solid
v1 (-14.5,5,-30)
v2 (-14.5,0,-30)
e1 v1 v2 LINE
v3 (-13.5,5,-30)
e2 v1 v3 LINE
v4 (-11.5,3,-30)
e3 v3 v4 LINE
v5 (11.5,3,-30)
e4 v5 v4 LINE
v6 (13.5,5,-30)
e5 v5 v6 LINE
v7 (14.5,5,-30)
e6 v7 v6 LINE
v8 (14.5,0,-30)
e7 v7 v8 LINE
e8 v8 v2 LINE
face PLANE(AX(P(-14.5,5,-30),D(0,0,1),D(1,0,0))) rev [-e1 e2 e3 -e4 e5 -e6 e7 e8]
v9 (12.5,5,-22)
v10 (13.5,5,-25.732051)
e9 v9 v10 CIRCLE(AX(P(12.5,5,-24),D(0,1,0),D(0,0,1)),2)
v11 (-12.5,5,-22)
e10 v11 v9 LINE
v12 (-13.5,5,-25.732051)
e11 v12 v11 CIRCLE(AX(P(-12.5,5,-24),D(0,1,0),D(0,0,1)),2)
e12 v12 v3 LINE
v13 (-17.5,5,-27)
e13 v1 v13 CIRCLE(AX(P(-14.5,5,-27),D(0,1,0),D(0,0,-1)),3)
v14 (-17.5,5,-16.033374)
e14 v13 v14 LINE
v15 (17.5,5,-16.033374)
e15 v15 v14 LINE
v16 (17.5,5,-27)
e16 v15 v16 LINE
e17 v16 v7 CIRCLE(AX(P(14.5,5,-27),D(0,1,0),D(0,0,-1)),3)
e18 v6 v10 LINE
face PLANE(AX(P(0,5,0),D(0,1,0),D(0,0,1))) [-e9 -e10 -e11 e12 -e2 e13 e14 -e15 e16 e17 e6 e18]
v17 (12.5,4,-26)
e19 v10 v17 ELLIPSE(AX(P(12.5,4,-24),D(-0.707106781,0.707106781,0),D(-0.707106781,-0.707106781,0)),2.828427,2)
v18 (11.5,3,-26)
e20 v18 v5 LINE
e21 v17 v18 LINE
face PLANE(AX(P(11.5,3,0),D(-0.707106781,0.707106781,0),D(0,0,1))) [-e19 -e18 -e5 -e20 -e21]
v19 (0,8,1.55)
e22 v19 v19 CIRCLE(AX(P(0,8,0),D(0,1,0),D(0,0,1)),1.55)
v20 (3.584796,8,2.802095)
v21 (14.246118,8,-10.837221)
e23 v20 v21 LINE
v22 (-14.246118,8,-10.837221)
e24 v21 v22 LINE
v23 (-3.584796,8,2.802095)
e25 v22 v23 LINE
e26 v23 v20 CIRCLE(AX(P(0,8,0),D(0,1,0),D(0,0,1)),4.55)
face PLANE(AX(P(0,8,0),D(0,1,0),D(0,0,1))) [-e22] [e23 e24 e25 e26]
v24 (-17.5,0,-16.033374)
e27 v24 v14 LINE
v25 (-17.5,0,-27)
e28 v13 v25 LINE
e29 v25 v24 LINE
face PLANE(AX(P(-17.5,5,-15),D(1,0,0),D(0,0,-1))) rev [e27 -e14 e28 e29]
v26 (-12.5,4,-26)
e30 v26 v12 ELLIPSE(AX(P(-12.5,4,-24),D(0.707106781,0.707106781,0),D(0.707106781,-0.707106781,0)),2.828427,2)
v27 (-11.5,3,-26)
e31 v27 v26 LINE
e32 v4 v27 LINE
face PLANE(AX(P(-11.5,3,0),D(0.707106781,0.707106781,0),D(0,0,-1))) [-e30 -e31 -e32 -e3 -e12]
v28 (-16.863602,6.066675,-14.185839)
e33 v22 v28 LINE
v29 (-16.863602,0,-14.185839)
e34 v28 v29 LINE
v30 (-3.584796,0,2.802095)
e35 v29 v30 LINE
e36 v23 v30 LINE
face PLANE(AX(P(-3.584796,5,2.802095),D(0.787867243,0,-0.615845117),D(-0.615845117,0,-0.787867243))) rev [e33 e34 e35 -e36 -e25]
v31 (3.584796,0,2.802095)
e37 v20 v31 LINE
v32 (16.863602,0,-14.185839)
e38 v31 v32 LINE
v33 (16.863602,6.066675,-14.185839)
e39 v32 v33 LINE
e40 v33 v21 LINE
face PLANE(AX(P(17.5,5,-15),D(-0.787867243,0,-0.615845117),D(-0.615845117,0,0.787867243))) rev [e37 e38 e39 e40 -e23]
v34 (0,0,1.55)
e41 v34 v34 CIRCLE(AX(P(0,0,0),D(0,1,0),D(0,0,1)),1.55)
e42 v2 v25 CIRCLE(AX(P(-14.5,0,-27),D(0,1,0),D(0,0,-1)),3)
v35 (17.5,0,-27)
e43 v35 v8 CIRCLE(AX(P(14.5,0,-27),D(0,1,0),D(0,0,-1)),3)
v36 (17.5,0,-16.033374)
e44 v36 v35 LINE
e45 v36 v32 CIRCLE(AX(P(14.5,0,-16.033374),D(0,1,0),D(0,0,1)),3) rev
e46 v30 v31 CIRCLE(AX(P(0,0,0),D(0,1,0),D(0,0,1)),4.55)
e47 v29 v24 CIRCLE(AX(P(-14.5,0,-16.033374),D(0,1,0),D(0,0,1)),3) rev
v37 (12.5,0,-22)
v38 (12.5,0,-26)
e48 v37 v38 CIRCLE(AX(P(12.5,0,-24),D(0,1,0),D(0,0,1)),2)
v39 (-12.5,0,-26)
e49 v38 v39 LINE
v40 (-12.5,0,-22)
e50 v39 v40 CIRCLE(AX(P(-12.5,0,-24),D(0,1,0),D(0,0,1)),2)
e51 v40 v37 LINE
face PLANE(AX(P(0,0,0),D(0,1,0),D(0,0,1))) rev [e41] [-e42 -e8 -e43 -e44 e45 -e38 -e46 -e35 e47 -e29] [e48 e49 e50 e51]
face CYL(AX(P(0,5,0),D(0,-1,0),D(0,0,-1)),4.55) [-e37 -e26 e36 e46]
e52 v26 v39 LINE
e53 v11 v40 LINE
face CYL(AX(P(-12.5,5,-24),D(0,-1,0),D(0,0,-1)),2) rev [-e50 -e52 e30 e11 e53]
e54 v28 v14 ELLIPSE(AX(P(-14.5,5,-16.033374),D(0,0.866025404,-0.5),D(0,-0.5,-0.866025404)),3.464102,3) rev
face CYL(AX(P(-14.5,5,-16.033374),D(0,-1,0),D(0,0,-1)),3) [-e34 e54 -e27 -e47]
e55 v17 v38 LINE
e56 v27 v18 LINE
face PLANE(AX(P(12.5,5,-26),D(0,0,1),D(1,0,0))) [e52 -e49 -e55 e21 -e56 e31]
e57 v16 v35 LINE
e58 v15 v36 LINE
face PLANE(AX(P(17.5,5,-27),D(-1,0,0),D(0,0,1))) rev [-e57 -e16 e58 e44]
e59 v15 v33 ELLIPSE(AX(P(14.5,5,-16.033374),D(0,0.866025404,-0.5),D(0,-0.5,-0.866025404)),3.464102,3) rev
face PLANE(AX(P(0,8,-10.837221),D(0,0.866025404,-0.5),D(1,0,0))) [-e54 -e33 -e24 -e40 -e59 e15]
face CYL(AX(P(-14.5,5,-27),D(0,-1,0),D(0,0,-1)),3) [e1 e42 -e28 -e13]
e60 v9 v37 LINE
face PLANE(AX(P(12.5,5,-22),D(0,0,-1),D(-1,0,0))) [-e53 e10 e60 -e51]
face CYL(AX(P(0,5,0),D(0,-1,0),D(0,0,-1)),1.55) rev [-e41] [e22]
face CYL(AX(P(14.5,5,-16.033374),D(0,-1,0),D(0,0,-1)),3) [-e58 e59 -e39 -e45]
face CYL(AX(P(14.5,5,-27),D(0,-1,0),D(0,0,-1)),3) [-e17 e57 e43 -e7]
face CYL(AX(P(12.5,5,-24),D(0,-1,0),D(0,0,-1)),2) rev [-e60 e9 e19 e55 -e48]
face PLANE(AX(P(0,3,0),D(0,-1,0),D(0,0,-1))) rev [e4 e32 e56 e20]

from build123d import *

# Parameters (mm, degrees)
SKETCH1_R           = 1.55
BOSS_EXTRUDE1_DEPTH = 5
SKETCH2_W           = 29
SKETCH2_H           = 6
CUT_EXTRUDE1_DEPTH  = 2
CHAMFER1_START      = 3
CHAMFER1_DEPTH      = 2
CHAMFER1_START_2    = -30
CHAMFER1_2_DEPTH    = 6
FILLET1_R           = 3
SKETCH3_R           = 1.55
BOSS_EXTRUDE2_DEPTH = 3
CHAMFER2_SIZE2      = 5.196152423
CHAMFER2_SIZE       = 3


with BuildPart() as part:
    # Sketch1 → Boss-Extrude1 (new body)
    with BuildSketch(Plane(origin=(0, 0, 0), x_dir=(1, 0, 0), z_dir=(0, 1, 0))):
        with BuildLine():
            Line((-3.584795955, -2.802095281), (-17.5, 15))
            Line((-17.5, 15), (-17.5, 27))
            ThreePointArc((-17.5, 27), (-16.621320344, 29.121320344), (-14.5, 30))
            Line((-14.5, 30), (14.5, 30))
            ThreePointArc((14.5, 30), (16.621320344, 29.121320344), (17.5, 27))
            Line((17.5, 27), (17.5, 15))
            Line((17.5, 15), (3.584795955, -2.802095281))
            ThreePointArc((3.584795955, -2.802095281), (0, -4.55), (-3.584795955, -2.802095281))
        make_face()
        with Locations(Location((0, 0, 0), (0, 0, 270))):
            Circle(SKETCH1_R, mode=Mode.SUBTRACT)
        with BuildLine():
            Line((12.5, 22), (-12.5, 22))
            ThreePointArc((-12.5, 22), (-14.5, 24), (-12.5, 26))
            Line((-12.5, 26), (12.5, 26))
            ThreePointArc((12.5, 26), (14.5, 24), (12.5, 22))
        make_face(mode=Mode.SUBTRACT)
    extrude(amount=BOSS_EXTRUDE1_DEPTH)

    # Sketch2 → Cut-Extrude1 (cut)
    with BuildSketch(Plane(origin=(0, 5, 0), x_dir=(1, 0, 0), z_dir=(0, 1, 0))):
        with Locations((0, 27)):
            Rectangle(SKETCH2_W, SKETCH2_H)
    extrude(amount=-CUT_EXTRUDE1_DEPTH, mode=Mode.SUBTRACT)

    # Chamfer1: read off the stored shape, not the designer's step
    # Chamfer1 outline → Chamfer1 (add)
    with BuildSketch(Plane(origin=(0, 0, 0), x_dir=(1, 0, 0), z_dir=(0, 1, 0)).offset(CHAMFER1_START)):
        with BuildLine():
            Line((-12.5, 26), (12.5, 26))
            ThreePointArc((12.5, 26), (13.914213562, 25.414213562), (14.5, 24))
            Line((14.5, 24), (14.5, 30))
            Line((14.5, 30), (-14.5, 30))
            Line((-14.5, 30), (-14.5, 24))
            ThreePointArc((-14.5, 24), (-13.914213562, 25.414213562), (-12.5, 26))
        make_face()
    extrude(amount=CHAMFER1_DEPTH)

    # Chamfer1 2 outline → Chamfer1 2 (cut)
    with BuildSketch(Plane.XY.offset(CHAMFER1_START_2)):
        Polygon((-13.5, 5), (-11.5, 3), (11.5, 3), (13.5, 5), align=None)
    extrude(amount=CHAMFER1_2_DEPTH, mode=Mode.SUBTRACT)

    # Fillet1
    fillet1_edges = [part.edges().sort_by_distance(p)[0] for p in [
        (-17.5, 2.5, -15),
        (17.5, 2.5, -15),
    ]]
    fillet(fillet1_edges, radius=FILLET1_R)

    # Sketch3 → Boss-Extrude2 (add)
    with BuildSketch(Plane(origin=(0, 5, 0), x_dir=(1, 0, 0), z_dir=(0, 1, 0))):
        with BuildLine():
            Line((-17.5, 16.033373903), (17.5, 16.033373903))
            ThreePointArc((17.5, 16.033373903), (17.33644189, 15.056338894), (16.863601728, 14.185838553))
            Line((16.863601728, 14.185838553), (3.584795955, -2.802095281))
            ThreePointArc((3.584795955, -2.802095281), (0, -4.55), (-3.584795955, -2.802095281))
            Line((-3.584795955, -2.802095281), (-16.863601728, 14.185838553))
            ThreePointArc((-16.863601728, 14.185838553), (-17.33644189, 15.056338894), (-17.5, 16.033373903))
        make_face()
        with Locations(Location((0, 0, 0), (0, 0, 270))):
            Circle(SKETCH3_R, mode=Mode.SUBTRACT)
    extrude(amount=BOSS_EXTRUDE2_DEPTH)

    # Chamfer2
    chamfer2_edges = [part.edges().sort_by_distance(p)[0] for p in [
        (0, 8, -16.033373903),
    ]]
    chamfer2_side = [part.faces().sort_by_distance(p)[0] for p in [
        (0, 7.94, -16.033373903),
    ]]
    chamfer(chamfer2_edges, length=CHAMFER2_SIZE - 0.0001, length2=CHAMFER2_SIZE2 - 0.0001, reference=chamfer2_side[0])  # a hair under: the kernel refuses the full size


solid = part.part
